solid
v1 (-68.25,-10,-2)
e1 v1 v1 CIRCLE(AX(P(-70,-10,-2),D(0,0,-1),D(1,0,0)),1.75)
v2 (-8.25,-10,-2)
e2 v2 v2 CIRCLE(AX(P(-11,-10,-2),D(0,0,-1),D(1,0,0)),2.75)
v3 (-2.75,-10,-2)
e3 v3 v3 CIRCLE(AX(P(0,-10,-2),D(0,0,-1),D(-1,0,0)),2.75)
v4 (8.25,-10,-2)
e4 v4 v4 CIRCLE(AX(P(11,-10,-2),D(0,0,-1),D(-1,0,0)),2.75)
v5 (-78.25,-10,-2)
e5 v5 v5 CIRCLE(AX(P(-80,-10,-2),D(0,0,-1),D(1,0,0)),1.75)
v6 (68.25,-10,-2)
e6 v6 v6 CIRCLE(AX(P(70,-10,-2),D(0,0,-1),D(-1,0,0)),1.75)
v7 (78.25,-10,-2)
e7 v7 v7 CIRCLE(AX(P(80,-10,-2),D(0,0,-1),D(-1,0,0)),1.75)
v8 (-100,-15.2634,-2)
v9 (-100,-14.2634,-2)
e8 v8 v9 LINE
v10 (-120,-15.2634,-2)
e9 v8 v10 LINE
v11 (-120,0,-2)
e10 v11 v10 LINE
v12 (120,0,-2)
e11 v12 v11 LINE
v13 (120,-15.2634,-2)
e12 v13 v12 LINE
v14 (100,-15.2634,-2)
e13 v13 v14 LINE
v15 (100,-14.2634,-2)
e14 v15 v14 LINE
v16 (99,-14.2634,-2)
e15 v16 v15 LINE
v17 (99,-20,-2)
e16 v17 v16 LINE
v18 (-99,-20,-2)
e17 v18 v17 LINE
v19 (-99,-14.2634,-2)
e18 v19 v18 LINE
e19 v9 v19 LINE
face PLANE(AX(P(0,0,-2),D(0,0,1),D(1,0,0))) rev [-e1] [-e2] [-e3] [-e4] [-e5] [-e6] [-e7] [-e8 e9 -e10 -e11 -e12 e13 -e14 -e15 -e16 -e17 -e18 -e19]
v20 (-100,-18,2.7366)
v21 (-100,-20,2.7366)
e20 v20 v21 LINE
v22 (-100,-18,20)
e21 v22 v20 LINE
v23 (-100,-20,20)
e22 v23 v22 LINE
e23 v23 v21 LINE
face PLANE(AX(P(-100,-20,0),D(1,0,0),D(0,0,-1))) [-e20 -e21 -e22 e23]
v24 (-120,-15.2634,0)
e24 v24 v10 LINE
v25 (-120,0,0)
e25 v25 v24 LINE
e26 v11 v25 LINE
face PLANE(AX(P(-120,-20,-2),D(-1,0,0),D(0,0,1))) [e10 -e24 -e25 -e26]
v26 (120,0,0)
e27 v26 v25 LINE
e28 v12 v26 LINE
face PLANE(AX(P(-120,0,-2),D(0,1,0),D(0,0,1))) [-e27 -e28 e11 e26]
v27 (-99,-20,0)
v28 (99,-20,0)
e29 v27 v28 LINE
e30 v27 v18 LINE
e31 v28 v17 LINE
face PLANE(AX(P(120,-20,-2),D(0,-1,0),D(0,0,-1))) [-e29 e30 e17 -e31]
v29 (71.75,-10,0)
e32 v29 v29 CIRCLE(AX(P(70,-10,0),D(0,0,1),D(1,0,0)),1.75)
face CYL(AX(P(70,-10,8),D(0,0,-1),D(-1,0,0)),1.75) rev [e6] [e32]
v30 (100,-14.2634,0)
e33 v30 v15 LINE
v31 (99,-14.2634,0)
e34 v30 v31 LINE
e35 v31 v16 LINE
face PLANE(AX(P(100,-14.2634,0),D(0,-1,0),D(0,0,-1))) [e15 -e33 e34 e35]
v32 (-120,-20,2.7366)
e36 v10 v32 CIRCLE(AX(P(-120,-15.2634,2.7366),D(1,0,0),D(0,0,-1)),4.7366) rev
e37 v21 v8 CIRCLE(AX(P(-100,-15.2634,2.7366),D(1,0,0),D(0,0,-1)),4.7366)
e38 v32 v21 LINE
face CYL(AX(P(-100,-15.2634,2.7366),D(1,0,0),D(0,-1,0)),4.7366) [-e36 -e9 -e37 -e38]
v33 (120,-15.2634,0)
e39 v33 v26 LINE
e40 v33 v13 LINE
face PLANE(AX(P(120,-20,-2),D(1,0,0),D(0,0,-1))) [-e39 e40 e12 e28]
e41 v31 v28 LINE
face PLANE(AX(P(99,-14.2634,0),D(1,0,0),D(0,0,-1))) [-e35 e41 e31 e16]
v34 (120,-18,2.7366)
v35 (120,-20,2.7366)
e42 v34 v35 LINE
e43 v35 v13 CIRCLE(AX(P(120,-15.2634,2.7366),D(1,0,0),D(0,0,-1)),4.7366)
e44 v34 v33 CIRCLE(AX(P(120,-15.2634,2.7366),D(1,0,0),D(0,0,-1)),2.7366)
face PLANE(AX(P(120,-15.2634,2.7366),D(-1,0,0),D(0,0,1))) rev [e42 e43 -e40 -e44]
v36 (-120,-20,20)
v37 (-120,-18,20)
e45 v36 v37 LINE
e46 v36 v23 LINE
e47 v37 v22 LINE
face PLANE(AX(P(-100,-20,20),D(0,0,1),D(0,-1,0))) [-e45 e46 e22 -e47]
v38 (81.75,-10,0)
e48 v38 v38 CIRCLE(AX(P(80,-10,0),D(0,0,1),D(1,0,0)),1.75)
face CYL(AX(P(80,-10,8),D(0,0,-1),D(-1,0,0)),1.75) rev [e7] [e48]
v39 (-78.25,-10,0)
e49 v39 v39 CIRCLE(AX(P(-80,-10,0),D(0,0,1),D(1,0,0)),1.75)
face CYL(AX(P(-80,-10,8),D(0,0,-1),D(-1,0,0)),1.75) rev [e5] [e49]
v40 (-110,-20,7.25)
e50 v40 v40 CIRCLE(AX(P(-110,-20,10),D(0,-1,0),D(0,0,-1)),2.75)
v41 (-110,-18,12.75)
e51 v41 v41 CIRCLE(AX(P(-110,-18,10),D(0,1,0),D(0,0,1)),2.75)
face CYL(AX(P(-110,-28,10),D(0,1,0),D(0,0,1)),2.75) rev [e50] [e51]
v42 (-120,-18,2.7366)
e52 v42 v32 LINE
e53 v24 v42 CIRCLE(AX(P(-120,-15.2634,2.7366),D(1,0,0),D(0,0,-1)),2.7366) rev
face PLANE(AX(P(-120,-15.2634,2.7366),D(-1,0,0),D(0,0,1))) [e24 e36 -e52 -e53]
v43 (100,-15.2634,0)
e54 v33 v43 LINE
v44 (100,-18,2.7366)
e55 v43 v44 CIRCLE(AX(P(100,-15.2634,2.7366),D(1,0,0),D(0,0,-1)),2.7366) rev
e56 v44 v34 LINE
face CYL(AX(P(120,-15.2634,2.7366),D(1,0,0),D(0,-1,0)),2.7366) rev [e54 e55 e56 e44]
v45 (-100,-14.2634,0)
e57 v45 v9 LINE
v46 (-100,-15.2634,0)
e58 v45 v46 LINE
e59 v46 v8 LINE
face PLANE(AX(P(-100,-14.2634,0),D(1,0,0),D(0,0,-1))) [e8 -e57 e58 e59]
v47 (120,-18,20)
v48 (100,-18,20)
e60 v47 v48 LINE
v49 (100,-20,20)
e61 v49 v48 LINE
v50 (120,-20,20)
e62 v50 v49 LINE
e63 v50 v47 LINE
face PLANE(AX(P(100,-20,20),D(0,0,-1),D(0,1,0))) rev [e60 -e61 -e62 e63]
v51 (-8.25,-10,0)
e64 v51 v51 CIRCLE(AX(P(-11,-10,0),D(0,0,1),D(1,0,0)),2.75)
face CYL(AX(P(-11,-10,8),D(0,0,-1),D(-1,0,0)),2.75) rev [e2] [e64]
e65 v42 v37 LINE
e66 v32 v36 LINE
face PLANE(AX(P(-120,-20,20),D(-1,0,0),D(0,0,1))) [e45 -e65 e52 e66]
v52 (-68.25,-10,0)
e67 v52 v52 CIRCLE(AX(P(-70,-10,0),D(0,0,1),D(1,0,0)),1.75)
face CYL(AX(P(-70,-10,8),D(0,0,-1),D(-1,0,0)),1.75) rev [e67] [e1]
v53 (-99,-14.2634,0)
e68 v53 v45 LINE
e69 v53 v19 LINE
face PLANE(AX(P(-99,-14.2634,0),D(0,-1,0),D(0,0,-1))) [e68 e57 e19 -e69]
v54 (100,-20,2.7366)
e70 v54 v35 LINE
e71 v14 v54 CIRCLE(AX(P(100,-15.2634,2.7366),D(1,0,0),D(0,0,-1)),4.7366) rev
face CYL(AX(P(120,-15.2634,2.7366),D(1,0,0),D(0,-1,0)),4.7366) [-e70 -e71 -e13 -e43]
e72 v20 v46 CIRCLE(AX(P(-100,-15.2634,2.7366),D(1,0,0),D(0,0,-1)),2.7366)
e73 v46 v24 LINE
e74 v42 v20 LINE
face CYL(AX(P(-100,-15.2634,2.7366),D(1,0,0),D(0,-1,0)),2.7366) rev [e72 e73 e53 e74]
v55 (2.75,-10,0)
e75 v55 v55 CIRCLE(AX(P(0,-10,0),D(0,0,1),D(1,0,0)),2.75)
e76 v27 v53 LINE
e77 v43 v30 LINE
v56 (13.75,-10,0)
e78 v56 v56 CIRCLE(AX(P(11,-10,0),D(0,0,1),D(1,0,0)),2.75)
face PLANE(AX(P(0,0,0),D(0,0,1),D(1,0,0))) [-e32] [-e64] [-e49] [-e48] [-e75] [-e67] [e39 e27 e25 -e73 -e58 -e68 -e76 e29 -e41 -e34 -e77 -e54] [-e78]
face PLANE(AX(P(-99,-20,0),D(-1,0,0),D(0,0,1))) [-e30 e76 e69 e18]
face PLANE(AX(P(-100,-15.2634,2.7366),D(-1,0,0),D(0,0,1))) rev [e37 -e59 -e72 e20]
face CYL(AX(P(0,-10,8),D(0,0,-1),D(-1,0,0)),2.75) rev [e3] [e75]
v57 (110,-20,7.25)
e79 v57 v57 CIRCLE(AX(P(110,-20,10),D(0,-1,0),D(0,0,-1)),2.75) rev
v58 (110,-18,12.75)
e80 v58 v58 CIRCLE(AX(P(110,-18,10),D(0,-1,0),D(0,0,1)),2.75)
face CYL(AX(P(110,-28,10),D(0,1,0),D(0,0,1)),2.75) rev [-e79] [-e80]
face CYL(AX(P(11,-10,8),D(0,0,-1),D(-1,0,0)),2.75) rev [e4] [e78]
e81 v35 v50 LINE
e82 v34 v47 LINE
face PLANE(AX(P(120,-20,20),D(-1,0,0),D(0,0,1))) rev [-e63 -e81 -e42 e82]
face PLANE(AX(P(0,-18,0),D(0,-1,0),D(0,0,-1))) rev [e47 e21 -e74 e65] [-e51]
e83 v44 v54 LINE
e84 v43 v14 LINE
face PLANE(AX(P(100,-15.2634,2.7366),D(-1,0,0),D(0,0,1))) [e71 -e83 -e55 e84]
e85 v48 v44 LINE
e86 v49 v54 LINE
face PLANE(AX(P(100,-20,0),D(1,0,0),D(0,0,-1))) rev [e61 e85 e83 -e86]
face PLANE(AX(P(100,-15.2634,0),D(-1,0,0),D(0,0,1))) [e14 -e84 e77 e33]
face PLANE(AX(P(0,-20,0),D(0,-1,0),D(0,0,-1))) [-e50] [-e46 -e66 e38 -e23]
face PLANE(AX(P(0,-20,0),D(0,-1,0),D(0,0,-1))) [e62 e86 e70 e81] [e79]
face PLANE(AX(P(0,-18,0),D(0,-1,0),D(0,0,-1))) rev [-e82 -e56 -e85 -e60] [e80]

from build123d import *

# Parameters (mm, degrees)
SKETCH_1_W                        = 240
SKETCH_1_H                        = 20
SM_BASE_FLANGE_1_DEPTH            = 2
SM_EDGE_FLANGE_1_STRIP_W          = 13.4732
SM_EDGE_FLANGE_1_STRIP_H          = 2
SM_EDGE_FLANGE_1_STRIP_CUT_DEPTH  = 20
SM_EDGE_FLANGE_1_RELIEF_W         = 14.4732
SM_EDGE_FLANGE_1_RELIEF_H         = 1
SM_EDGE_FLANGE_1_RELIEF_CUT_DEPTH = 2
SM_EDGE_FLANGE_1_DEPTH            = 20
SKETCH_10_R                       = 2.75
CUT_EXTRUDE_2_DEPTH               = 10
SKETCH_11_R                       = 2.75
SKETCH_11_R_2                     = 1.75
CUT_EXTRUDE_3_DEPTH               = 10


# Sheet-metal steps are written as plain solids
with BuildPart() as part:
    # Sketch 1 → 基体-法兰1 (new body)
    with BuildSketch(Plane.XY):
        with Locations((0, -10)):
            Rectangle(SKETCH_1_W, SKETCH_1_H)
    extrude(amount=-SM_BASE_FLANGE_1_DEPTH)

    # 边线-法兰1 strip (across the edge) → 边线-法兰1 strip cut (cut)
    with BuildSketch(Plane(origin=(-120, -20, 0), x_dir=(0, 1, 0), z_dir=(1, 0, 0))):
        with Locations((-2, -1)):
            Rectangle(SM_EDGE_FLANGE_1_STRIP_W, SM_EDGE_FLANGE_1_STRIP_H)
    sm_edge_flange_1_strip_cut = extrude(amount=SM_EDGE_FLANGE_1_STRIP_CUT_DEPTH, mode=Mode.SUBTRACT)

    # 边线-法兰1 relief (on the sheet) → 边线-法兰1 relief cut (cut)
    with BuildSketch(Plane(origin=(-120, -15.2634, 0), x_dir=(0, 1, 0), z_dir=(0, 0, 1))):
        with Locations((-6.2366, -20.5)):
            Rectangle(SM_EDGE_FLANGE_1_RELIEF_W, SM_EDGE_FLANGE_1_RELIEF_H)
    sm_edge_flange_1_relief_cut = extrude(amount=-SM_EDGE_FLANGE_1_RELIEF_CUT_DEPTH, mode=Mode.SUBTRACT)

    # 边线-法兰1 section (across the edge) → 边线-法兰1 (add)
    with BuildSketch(Plane(origin=(-120, -20, 0), x_dir=(0, 1, 0), z_dir=(1, 0, 0))):
        with BuildLine():
            Line((0, 2.7366), (0, 20))
            Line((0, 20), (2, 20))
            Line((2, 20), (2, 2.7366))
            ThreePointArc((2, 2.7366), (2.801531583, 0.801531583), (4.7366, 0))
            Line((4.7366, 0), (4.7366, -2))
            ThreePointArc((4.7366, -2), (1.38731802, -0.61268198), (0, 2.7366))
        make_face()
    sm_edge_flange_1 = extrude(amount=SM_EDGE_FLANGE_1_DEPTH)

    # 草图10 → 切除-拉伸2 (cut)
    with BuildSketch(Plane(origin=(0, -18, 0), x_dir=(1, 0, 0), z_dir=(0, 1, 0))):
        with Locations(Location((-110, -10, 0), (0, 0, 270))):
            Circle(SKETCH_10_R)
    cut_extrude_2 = extrude(amount=-CUT_EXTRUDE_2_DEPTH, mode=Mode.SUBTRACT)

    # 镜向1: 边线-法兰1 strip cut, 边线-法兰1 relief cut, 边线-法兰1, 切除-拉伸2 across plane
    add(sm_edge_flange_1_strip_cut.mirror(Plane(origin=(0, 0, 0), x_dir=(0, 0, 1), z_dir=(1, 0, 0))), mode=Mode.SUBTRACT)
    add(sm_edge_flange_1_relief_cut.mirror(Plane(origin=(0, 0, 0), x_dir=(0, 0, 1), z_dir=(1, 0, 0))), mode=Mode.SUBTRACT)
    add(sm_edge_flange_1.mirror(Plane(origin=(0, 0, 0), x_dir=(0, 0, 1), z_dir=(1, 0, 0))))
    add(cut_extrude_2.mirror(Plane(origin=(0, 0, 0), x_dir=(0, 0, 1), z_dir=(1, 0, 0))), mode=Mode.SUBTRACT)

    # 草图11 → 切除-拉伸3 (cut)
    with BuildSketch(Plane(origin=(0, 0, -2), x_dir=(-1, 0, 0), z_dir=(0, 0, -1))):
        with Locations((0, -10)):
            Circle(SKETCH_11_R)
        with Locations((-11, -10)):
            Circle(SKETCH_11_R)
        with Locations(Location((11, -10, 0), (0, 0, 180))):
            Circle(SKETCH_11_R)
        with Locations((-80, -10)):
            Circle(SKETCH_11_R_2)
        with Locations((-70, -10)):
            Circle(SKETCH_11_R_2)
        with Locations(Location((80, -10, 0), (0, 0, 180))):
            Circle(SKETCH_11_R_2)
        with Locations(Location((70, -10, 0), (0, 0, 180))):
            Circle(SKETCH_11_R_2)
    extrude(amount=-CUT_EXTRUDE_3_DEPTH, mode=Mode.SUBTRACT)


solid = part.part
